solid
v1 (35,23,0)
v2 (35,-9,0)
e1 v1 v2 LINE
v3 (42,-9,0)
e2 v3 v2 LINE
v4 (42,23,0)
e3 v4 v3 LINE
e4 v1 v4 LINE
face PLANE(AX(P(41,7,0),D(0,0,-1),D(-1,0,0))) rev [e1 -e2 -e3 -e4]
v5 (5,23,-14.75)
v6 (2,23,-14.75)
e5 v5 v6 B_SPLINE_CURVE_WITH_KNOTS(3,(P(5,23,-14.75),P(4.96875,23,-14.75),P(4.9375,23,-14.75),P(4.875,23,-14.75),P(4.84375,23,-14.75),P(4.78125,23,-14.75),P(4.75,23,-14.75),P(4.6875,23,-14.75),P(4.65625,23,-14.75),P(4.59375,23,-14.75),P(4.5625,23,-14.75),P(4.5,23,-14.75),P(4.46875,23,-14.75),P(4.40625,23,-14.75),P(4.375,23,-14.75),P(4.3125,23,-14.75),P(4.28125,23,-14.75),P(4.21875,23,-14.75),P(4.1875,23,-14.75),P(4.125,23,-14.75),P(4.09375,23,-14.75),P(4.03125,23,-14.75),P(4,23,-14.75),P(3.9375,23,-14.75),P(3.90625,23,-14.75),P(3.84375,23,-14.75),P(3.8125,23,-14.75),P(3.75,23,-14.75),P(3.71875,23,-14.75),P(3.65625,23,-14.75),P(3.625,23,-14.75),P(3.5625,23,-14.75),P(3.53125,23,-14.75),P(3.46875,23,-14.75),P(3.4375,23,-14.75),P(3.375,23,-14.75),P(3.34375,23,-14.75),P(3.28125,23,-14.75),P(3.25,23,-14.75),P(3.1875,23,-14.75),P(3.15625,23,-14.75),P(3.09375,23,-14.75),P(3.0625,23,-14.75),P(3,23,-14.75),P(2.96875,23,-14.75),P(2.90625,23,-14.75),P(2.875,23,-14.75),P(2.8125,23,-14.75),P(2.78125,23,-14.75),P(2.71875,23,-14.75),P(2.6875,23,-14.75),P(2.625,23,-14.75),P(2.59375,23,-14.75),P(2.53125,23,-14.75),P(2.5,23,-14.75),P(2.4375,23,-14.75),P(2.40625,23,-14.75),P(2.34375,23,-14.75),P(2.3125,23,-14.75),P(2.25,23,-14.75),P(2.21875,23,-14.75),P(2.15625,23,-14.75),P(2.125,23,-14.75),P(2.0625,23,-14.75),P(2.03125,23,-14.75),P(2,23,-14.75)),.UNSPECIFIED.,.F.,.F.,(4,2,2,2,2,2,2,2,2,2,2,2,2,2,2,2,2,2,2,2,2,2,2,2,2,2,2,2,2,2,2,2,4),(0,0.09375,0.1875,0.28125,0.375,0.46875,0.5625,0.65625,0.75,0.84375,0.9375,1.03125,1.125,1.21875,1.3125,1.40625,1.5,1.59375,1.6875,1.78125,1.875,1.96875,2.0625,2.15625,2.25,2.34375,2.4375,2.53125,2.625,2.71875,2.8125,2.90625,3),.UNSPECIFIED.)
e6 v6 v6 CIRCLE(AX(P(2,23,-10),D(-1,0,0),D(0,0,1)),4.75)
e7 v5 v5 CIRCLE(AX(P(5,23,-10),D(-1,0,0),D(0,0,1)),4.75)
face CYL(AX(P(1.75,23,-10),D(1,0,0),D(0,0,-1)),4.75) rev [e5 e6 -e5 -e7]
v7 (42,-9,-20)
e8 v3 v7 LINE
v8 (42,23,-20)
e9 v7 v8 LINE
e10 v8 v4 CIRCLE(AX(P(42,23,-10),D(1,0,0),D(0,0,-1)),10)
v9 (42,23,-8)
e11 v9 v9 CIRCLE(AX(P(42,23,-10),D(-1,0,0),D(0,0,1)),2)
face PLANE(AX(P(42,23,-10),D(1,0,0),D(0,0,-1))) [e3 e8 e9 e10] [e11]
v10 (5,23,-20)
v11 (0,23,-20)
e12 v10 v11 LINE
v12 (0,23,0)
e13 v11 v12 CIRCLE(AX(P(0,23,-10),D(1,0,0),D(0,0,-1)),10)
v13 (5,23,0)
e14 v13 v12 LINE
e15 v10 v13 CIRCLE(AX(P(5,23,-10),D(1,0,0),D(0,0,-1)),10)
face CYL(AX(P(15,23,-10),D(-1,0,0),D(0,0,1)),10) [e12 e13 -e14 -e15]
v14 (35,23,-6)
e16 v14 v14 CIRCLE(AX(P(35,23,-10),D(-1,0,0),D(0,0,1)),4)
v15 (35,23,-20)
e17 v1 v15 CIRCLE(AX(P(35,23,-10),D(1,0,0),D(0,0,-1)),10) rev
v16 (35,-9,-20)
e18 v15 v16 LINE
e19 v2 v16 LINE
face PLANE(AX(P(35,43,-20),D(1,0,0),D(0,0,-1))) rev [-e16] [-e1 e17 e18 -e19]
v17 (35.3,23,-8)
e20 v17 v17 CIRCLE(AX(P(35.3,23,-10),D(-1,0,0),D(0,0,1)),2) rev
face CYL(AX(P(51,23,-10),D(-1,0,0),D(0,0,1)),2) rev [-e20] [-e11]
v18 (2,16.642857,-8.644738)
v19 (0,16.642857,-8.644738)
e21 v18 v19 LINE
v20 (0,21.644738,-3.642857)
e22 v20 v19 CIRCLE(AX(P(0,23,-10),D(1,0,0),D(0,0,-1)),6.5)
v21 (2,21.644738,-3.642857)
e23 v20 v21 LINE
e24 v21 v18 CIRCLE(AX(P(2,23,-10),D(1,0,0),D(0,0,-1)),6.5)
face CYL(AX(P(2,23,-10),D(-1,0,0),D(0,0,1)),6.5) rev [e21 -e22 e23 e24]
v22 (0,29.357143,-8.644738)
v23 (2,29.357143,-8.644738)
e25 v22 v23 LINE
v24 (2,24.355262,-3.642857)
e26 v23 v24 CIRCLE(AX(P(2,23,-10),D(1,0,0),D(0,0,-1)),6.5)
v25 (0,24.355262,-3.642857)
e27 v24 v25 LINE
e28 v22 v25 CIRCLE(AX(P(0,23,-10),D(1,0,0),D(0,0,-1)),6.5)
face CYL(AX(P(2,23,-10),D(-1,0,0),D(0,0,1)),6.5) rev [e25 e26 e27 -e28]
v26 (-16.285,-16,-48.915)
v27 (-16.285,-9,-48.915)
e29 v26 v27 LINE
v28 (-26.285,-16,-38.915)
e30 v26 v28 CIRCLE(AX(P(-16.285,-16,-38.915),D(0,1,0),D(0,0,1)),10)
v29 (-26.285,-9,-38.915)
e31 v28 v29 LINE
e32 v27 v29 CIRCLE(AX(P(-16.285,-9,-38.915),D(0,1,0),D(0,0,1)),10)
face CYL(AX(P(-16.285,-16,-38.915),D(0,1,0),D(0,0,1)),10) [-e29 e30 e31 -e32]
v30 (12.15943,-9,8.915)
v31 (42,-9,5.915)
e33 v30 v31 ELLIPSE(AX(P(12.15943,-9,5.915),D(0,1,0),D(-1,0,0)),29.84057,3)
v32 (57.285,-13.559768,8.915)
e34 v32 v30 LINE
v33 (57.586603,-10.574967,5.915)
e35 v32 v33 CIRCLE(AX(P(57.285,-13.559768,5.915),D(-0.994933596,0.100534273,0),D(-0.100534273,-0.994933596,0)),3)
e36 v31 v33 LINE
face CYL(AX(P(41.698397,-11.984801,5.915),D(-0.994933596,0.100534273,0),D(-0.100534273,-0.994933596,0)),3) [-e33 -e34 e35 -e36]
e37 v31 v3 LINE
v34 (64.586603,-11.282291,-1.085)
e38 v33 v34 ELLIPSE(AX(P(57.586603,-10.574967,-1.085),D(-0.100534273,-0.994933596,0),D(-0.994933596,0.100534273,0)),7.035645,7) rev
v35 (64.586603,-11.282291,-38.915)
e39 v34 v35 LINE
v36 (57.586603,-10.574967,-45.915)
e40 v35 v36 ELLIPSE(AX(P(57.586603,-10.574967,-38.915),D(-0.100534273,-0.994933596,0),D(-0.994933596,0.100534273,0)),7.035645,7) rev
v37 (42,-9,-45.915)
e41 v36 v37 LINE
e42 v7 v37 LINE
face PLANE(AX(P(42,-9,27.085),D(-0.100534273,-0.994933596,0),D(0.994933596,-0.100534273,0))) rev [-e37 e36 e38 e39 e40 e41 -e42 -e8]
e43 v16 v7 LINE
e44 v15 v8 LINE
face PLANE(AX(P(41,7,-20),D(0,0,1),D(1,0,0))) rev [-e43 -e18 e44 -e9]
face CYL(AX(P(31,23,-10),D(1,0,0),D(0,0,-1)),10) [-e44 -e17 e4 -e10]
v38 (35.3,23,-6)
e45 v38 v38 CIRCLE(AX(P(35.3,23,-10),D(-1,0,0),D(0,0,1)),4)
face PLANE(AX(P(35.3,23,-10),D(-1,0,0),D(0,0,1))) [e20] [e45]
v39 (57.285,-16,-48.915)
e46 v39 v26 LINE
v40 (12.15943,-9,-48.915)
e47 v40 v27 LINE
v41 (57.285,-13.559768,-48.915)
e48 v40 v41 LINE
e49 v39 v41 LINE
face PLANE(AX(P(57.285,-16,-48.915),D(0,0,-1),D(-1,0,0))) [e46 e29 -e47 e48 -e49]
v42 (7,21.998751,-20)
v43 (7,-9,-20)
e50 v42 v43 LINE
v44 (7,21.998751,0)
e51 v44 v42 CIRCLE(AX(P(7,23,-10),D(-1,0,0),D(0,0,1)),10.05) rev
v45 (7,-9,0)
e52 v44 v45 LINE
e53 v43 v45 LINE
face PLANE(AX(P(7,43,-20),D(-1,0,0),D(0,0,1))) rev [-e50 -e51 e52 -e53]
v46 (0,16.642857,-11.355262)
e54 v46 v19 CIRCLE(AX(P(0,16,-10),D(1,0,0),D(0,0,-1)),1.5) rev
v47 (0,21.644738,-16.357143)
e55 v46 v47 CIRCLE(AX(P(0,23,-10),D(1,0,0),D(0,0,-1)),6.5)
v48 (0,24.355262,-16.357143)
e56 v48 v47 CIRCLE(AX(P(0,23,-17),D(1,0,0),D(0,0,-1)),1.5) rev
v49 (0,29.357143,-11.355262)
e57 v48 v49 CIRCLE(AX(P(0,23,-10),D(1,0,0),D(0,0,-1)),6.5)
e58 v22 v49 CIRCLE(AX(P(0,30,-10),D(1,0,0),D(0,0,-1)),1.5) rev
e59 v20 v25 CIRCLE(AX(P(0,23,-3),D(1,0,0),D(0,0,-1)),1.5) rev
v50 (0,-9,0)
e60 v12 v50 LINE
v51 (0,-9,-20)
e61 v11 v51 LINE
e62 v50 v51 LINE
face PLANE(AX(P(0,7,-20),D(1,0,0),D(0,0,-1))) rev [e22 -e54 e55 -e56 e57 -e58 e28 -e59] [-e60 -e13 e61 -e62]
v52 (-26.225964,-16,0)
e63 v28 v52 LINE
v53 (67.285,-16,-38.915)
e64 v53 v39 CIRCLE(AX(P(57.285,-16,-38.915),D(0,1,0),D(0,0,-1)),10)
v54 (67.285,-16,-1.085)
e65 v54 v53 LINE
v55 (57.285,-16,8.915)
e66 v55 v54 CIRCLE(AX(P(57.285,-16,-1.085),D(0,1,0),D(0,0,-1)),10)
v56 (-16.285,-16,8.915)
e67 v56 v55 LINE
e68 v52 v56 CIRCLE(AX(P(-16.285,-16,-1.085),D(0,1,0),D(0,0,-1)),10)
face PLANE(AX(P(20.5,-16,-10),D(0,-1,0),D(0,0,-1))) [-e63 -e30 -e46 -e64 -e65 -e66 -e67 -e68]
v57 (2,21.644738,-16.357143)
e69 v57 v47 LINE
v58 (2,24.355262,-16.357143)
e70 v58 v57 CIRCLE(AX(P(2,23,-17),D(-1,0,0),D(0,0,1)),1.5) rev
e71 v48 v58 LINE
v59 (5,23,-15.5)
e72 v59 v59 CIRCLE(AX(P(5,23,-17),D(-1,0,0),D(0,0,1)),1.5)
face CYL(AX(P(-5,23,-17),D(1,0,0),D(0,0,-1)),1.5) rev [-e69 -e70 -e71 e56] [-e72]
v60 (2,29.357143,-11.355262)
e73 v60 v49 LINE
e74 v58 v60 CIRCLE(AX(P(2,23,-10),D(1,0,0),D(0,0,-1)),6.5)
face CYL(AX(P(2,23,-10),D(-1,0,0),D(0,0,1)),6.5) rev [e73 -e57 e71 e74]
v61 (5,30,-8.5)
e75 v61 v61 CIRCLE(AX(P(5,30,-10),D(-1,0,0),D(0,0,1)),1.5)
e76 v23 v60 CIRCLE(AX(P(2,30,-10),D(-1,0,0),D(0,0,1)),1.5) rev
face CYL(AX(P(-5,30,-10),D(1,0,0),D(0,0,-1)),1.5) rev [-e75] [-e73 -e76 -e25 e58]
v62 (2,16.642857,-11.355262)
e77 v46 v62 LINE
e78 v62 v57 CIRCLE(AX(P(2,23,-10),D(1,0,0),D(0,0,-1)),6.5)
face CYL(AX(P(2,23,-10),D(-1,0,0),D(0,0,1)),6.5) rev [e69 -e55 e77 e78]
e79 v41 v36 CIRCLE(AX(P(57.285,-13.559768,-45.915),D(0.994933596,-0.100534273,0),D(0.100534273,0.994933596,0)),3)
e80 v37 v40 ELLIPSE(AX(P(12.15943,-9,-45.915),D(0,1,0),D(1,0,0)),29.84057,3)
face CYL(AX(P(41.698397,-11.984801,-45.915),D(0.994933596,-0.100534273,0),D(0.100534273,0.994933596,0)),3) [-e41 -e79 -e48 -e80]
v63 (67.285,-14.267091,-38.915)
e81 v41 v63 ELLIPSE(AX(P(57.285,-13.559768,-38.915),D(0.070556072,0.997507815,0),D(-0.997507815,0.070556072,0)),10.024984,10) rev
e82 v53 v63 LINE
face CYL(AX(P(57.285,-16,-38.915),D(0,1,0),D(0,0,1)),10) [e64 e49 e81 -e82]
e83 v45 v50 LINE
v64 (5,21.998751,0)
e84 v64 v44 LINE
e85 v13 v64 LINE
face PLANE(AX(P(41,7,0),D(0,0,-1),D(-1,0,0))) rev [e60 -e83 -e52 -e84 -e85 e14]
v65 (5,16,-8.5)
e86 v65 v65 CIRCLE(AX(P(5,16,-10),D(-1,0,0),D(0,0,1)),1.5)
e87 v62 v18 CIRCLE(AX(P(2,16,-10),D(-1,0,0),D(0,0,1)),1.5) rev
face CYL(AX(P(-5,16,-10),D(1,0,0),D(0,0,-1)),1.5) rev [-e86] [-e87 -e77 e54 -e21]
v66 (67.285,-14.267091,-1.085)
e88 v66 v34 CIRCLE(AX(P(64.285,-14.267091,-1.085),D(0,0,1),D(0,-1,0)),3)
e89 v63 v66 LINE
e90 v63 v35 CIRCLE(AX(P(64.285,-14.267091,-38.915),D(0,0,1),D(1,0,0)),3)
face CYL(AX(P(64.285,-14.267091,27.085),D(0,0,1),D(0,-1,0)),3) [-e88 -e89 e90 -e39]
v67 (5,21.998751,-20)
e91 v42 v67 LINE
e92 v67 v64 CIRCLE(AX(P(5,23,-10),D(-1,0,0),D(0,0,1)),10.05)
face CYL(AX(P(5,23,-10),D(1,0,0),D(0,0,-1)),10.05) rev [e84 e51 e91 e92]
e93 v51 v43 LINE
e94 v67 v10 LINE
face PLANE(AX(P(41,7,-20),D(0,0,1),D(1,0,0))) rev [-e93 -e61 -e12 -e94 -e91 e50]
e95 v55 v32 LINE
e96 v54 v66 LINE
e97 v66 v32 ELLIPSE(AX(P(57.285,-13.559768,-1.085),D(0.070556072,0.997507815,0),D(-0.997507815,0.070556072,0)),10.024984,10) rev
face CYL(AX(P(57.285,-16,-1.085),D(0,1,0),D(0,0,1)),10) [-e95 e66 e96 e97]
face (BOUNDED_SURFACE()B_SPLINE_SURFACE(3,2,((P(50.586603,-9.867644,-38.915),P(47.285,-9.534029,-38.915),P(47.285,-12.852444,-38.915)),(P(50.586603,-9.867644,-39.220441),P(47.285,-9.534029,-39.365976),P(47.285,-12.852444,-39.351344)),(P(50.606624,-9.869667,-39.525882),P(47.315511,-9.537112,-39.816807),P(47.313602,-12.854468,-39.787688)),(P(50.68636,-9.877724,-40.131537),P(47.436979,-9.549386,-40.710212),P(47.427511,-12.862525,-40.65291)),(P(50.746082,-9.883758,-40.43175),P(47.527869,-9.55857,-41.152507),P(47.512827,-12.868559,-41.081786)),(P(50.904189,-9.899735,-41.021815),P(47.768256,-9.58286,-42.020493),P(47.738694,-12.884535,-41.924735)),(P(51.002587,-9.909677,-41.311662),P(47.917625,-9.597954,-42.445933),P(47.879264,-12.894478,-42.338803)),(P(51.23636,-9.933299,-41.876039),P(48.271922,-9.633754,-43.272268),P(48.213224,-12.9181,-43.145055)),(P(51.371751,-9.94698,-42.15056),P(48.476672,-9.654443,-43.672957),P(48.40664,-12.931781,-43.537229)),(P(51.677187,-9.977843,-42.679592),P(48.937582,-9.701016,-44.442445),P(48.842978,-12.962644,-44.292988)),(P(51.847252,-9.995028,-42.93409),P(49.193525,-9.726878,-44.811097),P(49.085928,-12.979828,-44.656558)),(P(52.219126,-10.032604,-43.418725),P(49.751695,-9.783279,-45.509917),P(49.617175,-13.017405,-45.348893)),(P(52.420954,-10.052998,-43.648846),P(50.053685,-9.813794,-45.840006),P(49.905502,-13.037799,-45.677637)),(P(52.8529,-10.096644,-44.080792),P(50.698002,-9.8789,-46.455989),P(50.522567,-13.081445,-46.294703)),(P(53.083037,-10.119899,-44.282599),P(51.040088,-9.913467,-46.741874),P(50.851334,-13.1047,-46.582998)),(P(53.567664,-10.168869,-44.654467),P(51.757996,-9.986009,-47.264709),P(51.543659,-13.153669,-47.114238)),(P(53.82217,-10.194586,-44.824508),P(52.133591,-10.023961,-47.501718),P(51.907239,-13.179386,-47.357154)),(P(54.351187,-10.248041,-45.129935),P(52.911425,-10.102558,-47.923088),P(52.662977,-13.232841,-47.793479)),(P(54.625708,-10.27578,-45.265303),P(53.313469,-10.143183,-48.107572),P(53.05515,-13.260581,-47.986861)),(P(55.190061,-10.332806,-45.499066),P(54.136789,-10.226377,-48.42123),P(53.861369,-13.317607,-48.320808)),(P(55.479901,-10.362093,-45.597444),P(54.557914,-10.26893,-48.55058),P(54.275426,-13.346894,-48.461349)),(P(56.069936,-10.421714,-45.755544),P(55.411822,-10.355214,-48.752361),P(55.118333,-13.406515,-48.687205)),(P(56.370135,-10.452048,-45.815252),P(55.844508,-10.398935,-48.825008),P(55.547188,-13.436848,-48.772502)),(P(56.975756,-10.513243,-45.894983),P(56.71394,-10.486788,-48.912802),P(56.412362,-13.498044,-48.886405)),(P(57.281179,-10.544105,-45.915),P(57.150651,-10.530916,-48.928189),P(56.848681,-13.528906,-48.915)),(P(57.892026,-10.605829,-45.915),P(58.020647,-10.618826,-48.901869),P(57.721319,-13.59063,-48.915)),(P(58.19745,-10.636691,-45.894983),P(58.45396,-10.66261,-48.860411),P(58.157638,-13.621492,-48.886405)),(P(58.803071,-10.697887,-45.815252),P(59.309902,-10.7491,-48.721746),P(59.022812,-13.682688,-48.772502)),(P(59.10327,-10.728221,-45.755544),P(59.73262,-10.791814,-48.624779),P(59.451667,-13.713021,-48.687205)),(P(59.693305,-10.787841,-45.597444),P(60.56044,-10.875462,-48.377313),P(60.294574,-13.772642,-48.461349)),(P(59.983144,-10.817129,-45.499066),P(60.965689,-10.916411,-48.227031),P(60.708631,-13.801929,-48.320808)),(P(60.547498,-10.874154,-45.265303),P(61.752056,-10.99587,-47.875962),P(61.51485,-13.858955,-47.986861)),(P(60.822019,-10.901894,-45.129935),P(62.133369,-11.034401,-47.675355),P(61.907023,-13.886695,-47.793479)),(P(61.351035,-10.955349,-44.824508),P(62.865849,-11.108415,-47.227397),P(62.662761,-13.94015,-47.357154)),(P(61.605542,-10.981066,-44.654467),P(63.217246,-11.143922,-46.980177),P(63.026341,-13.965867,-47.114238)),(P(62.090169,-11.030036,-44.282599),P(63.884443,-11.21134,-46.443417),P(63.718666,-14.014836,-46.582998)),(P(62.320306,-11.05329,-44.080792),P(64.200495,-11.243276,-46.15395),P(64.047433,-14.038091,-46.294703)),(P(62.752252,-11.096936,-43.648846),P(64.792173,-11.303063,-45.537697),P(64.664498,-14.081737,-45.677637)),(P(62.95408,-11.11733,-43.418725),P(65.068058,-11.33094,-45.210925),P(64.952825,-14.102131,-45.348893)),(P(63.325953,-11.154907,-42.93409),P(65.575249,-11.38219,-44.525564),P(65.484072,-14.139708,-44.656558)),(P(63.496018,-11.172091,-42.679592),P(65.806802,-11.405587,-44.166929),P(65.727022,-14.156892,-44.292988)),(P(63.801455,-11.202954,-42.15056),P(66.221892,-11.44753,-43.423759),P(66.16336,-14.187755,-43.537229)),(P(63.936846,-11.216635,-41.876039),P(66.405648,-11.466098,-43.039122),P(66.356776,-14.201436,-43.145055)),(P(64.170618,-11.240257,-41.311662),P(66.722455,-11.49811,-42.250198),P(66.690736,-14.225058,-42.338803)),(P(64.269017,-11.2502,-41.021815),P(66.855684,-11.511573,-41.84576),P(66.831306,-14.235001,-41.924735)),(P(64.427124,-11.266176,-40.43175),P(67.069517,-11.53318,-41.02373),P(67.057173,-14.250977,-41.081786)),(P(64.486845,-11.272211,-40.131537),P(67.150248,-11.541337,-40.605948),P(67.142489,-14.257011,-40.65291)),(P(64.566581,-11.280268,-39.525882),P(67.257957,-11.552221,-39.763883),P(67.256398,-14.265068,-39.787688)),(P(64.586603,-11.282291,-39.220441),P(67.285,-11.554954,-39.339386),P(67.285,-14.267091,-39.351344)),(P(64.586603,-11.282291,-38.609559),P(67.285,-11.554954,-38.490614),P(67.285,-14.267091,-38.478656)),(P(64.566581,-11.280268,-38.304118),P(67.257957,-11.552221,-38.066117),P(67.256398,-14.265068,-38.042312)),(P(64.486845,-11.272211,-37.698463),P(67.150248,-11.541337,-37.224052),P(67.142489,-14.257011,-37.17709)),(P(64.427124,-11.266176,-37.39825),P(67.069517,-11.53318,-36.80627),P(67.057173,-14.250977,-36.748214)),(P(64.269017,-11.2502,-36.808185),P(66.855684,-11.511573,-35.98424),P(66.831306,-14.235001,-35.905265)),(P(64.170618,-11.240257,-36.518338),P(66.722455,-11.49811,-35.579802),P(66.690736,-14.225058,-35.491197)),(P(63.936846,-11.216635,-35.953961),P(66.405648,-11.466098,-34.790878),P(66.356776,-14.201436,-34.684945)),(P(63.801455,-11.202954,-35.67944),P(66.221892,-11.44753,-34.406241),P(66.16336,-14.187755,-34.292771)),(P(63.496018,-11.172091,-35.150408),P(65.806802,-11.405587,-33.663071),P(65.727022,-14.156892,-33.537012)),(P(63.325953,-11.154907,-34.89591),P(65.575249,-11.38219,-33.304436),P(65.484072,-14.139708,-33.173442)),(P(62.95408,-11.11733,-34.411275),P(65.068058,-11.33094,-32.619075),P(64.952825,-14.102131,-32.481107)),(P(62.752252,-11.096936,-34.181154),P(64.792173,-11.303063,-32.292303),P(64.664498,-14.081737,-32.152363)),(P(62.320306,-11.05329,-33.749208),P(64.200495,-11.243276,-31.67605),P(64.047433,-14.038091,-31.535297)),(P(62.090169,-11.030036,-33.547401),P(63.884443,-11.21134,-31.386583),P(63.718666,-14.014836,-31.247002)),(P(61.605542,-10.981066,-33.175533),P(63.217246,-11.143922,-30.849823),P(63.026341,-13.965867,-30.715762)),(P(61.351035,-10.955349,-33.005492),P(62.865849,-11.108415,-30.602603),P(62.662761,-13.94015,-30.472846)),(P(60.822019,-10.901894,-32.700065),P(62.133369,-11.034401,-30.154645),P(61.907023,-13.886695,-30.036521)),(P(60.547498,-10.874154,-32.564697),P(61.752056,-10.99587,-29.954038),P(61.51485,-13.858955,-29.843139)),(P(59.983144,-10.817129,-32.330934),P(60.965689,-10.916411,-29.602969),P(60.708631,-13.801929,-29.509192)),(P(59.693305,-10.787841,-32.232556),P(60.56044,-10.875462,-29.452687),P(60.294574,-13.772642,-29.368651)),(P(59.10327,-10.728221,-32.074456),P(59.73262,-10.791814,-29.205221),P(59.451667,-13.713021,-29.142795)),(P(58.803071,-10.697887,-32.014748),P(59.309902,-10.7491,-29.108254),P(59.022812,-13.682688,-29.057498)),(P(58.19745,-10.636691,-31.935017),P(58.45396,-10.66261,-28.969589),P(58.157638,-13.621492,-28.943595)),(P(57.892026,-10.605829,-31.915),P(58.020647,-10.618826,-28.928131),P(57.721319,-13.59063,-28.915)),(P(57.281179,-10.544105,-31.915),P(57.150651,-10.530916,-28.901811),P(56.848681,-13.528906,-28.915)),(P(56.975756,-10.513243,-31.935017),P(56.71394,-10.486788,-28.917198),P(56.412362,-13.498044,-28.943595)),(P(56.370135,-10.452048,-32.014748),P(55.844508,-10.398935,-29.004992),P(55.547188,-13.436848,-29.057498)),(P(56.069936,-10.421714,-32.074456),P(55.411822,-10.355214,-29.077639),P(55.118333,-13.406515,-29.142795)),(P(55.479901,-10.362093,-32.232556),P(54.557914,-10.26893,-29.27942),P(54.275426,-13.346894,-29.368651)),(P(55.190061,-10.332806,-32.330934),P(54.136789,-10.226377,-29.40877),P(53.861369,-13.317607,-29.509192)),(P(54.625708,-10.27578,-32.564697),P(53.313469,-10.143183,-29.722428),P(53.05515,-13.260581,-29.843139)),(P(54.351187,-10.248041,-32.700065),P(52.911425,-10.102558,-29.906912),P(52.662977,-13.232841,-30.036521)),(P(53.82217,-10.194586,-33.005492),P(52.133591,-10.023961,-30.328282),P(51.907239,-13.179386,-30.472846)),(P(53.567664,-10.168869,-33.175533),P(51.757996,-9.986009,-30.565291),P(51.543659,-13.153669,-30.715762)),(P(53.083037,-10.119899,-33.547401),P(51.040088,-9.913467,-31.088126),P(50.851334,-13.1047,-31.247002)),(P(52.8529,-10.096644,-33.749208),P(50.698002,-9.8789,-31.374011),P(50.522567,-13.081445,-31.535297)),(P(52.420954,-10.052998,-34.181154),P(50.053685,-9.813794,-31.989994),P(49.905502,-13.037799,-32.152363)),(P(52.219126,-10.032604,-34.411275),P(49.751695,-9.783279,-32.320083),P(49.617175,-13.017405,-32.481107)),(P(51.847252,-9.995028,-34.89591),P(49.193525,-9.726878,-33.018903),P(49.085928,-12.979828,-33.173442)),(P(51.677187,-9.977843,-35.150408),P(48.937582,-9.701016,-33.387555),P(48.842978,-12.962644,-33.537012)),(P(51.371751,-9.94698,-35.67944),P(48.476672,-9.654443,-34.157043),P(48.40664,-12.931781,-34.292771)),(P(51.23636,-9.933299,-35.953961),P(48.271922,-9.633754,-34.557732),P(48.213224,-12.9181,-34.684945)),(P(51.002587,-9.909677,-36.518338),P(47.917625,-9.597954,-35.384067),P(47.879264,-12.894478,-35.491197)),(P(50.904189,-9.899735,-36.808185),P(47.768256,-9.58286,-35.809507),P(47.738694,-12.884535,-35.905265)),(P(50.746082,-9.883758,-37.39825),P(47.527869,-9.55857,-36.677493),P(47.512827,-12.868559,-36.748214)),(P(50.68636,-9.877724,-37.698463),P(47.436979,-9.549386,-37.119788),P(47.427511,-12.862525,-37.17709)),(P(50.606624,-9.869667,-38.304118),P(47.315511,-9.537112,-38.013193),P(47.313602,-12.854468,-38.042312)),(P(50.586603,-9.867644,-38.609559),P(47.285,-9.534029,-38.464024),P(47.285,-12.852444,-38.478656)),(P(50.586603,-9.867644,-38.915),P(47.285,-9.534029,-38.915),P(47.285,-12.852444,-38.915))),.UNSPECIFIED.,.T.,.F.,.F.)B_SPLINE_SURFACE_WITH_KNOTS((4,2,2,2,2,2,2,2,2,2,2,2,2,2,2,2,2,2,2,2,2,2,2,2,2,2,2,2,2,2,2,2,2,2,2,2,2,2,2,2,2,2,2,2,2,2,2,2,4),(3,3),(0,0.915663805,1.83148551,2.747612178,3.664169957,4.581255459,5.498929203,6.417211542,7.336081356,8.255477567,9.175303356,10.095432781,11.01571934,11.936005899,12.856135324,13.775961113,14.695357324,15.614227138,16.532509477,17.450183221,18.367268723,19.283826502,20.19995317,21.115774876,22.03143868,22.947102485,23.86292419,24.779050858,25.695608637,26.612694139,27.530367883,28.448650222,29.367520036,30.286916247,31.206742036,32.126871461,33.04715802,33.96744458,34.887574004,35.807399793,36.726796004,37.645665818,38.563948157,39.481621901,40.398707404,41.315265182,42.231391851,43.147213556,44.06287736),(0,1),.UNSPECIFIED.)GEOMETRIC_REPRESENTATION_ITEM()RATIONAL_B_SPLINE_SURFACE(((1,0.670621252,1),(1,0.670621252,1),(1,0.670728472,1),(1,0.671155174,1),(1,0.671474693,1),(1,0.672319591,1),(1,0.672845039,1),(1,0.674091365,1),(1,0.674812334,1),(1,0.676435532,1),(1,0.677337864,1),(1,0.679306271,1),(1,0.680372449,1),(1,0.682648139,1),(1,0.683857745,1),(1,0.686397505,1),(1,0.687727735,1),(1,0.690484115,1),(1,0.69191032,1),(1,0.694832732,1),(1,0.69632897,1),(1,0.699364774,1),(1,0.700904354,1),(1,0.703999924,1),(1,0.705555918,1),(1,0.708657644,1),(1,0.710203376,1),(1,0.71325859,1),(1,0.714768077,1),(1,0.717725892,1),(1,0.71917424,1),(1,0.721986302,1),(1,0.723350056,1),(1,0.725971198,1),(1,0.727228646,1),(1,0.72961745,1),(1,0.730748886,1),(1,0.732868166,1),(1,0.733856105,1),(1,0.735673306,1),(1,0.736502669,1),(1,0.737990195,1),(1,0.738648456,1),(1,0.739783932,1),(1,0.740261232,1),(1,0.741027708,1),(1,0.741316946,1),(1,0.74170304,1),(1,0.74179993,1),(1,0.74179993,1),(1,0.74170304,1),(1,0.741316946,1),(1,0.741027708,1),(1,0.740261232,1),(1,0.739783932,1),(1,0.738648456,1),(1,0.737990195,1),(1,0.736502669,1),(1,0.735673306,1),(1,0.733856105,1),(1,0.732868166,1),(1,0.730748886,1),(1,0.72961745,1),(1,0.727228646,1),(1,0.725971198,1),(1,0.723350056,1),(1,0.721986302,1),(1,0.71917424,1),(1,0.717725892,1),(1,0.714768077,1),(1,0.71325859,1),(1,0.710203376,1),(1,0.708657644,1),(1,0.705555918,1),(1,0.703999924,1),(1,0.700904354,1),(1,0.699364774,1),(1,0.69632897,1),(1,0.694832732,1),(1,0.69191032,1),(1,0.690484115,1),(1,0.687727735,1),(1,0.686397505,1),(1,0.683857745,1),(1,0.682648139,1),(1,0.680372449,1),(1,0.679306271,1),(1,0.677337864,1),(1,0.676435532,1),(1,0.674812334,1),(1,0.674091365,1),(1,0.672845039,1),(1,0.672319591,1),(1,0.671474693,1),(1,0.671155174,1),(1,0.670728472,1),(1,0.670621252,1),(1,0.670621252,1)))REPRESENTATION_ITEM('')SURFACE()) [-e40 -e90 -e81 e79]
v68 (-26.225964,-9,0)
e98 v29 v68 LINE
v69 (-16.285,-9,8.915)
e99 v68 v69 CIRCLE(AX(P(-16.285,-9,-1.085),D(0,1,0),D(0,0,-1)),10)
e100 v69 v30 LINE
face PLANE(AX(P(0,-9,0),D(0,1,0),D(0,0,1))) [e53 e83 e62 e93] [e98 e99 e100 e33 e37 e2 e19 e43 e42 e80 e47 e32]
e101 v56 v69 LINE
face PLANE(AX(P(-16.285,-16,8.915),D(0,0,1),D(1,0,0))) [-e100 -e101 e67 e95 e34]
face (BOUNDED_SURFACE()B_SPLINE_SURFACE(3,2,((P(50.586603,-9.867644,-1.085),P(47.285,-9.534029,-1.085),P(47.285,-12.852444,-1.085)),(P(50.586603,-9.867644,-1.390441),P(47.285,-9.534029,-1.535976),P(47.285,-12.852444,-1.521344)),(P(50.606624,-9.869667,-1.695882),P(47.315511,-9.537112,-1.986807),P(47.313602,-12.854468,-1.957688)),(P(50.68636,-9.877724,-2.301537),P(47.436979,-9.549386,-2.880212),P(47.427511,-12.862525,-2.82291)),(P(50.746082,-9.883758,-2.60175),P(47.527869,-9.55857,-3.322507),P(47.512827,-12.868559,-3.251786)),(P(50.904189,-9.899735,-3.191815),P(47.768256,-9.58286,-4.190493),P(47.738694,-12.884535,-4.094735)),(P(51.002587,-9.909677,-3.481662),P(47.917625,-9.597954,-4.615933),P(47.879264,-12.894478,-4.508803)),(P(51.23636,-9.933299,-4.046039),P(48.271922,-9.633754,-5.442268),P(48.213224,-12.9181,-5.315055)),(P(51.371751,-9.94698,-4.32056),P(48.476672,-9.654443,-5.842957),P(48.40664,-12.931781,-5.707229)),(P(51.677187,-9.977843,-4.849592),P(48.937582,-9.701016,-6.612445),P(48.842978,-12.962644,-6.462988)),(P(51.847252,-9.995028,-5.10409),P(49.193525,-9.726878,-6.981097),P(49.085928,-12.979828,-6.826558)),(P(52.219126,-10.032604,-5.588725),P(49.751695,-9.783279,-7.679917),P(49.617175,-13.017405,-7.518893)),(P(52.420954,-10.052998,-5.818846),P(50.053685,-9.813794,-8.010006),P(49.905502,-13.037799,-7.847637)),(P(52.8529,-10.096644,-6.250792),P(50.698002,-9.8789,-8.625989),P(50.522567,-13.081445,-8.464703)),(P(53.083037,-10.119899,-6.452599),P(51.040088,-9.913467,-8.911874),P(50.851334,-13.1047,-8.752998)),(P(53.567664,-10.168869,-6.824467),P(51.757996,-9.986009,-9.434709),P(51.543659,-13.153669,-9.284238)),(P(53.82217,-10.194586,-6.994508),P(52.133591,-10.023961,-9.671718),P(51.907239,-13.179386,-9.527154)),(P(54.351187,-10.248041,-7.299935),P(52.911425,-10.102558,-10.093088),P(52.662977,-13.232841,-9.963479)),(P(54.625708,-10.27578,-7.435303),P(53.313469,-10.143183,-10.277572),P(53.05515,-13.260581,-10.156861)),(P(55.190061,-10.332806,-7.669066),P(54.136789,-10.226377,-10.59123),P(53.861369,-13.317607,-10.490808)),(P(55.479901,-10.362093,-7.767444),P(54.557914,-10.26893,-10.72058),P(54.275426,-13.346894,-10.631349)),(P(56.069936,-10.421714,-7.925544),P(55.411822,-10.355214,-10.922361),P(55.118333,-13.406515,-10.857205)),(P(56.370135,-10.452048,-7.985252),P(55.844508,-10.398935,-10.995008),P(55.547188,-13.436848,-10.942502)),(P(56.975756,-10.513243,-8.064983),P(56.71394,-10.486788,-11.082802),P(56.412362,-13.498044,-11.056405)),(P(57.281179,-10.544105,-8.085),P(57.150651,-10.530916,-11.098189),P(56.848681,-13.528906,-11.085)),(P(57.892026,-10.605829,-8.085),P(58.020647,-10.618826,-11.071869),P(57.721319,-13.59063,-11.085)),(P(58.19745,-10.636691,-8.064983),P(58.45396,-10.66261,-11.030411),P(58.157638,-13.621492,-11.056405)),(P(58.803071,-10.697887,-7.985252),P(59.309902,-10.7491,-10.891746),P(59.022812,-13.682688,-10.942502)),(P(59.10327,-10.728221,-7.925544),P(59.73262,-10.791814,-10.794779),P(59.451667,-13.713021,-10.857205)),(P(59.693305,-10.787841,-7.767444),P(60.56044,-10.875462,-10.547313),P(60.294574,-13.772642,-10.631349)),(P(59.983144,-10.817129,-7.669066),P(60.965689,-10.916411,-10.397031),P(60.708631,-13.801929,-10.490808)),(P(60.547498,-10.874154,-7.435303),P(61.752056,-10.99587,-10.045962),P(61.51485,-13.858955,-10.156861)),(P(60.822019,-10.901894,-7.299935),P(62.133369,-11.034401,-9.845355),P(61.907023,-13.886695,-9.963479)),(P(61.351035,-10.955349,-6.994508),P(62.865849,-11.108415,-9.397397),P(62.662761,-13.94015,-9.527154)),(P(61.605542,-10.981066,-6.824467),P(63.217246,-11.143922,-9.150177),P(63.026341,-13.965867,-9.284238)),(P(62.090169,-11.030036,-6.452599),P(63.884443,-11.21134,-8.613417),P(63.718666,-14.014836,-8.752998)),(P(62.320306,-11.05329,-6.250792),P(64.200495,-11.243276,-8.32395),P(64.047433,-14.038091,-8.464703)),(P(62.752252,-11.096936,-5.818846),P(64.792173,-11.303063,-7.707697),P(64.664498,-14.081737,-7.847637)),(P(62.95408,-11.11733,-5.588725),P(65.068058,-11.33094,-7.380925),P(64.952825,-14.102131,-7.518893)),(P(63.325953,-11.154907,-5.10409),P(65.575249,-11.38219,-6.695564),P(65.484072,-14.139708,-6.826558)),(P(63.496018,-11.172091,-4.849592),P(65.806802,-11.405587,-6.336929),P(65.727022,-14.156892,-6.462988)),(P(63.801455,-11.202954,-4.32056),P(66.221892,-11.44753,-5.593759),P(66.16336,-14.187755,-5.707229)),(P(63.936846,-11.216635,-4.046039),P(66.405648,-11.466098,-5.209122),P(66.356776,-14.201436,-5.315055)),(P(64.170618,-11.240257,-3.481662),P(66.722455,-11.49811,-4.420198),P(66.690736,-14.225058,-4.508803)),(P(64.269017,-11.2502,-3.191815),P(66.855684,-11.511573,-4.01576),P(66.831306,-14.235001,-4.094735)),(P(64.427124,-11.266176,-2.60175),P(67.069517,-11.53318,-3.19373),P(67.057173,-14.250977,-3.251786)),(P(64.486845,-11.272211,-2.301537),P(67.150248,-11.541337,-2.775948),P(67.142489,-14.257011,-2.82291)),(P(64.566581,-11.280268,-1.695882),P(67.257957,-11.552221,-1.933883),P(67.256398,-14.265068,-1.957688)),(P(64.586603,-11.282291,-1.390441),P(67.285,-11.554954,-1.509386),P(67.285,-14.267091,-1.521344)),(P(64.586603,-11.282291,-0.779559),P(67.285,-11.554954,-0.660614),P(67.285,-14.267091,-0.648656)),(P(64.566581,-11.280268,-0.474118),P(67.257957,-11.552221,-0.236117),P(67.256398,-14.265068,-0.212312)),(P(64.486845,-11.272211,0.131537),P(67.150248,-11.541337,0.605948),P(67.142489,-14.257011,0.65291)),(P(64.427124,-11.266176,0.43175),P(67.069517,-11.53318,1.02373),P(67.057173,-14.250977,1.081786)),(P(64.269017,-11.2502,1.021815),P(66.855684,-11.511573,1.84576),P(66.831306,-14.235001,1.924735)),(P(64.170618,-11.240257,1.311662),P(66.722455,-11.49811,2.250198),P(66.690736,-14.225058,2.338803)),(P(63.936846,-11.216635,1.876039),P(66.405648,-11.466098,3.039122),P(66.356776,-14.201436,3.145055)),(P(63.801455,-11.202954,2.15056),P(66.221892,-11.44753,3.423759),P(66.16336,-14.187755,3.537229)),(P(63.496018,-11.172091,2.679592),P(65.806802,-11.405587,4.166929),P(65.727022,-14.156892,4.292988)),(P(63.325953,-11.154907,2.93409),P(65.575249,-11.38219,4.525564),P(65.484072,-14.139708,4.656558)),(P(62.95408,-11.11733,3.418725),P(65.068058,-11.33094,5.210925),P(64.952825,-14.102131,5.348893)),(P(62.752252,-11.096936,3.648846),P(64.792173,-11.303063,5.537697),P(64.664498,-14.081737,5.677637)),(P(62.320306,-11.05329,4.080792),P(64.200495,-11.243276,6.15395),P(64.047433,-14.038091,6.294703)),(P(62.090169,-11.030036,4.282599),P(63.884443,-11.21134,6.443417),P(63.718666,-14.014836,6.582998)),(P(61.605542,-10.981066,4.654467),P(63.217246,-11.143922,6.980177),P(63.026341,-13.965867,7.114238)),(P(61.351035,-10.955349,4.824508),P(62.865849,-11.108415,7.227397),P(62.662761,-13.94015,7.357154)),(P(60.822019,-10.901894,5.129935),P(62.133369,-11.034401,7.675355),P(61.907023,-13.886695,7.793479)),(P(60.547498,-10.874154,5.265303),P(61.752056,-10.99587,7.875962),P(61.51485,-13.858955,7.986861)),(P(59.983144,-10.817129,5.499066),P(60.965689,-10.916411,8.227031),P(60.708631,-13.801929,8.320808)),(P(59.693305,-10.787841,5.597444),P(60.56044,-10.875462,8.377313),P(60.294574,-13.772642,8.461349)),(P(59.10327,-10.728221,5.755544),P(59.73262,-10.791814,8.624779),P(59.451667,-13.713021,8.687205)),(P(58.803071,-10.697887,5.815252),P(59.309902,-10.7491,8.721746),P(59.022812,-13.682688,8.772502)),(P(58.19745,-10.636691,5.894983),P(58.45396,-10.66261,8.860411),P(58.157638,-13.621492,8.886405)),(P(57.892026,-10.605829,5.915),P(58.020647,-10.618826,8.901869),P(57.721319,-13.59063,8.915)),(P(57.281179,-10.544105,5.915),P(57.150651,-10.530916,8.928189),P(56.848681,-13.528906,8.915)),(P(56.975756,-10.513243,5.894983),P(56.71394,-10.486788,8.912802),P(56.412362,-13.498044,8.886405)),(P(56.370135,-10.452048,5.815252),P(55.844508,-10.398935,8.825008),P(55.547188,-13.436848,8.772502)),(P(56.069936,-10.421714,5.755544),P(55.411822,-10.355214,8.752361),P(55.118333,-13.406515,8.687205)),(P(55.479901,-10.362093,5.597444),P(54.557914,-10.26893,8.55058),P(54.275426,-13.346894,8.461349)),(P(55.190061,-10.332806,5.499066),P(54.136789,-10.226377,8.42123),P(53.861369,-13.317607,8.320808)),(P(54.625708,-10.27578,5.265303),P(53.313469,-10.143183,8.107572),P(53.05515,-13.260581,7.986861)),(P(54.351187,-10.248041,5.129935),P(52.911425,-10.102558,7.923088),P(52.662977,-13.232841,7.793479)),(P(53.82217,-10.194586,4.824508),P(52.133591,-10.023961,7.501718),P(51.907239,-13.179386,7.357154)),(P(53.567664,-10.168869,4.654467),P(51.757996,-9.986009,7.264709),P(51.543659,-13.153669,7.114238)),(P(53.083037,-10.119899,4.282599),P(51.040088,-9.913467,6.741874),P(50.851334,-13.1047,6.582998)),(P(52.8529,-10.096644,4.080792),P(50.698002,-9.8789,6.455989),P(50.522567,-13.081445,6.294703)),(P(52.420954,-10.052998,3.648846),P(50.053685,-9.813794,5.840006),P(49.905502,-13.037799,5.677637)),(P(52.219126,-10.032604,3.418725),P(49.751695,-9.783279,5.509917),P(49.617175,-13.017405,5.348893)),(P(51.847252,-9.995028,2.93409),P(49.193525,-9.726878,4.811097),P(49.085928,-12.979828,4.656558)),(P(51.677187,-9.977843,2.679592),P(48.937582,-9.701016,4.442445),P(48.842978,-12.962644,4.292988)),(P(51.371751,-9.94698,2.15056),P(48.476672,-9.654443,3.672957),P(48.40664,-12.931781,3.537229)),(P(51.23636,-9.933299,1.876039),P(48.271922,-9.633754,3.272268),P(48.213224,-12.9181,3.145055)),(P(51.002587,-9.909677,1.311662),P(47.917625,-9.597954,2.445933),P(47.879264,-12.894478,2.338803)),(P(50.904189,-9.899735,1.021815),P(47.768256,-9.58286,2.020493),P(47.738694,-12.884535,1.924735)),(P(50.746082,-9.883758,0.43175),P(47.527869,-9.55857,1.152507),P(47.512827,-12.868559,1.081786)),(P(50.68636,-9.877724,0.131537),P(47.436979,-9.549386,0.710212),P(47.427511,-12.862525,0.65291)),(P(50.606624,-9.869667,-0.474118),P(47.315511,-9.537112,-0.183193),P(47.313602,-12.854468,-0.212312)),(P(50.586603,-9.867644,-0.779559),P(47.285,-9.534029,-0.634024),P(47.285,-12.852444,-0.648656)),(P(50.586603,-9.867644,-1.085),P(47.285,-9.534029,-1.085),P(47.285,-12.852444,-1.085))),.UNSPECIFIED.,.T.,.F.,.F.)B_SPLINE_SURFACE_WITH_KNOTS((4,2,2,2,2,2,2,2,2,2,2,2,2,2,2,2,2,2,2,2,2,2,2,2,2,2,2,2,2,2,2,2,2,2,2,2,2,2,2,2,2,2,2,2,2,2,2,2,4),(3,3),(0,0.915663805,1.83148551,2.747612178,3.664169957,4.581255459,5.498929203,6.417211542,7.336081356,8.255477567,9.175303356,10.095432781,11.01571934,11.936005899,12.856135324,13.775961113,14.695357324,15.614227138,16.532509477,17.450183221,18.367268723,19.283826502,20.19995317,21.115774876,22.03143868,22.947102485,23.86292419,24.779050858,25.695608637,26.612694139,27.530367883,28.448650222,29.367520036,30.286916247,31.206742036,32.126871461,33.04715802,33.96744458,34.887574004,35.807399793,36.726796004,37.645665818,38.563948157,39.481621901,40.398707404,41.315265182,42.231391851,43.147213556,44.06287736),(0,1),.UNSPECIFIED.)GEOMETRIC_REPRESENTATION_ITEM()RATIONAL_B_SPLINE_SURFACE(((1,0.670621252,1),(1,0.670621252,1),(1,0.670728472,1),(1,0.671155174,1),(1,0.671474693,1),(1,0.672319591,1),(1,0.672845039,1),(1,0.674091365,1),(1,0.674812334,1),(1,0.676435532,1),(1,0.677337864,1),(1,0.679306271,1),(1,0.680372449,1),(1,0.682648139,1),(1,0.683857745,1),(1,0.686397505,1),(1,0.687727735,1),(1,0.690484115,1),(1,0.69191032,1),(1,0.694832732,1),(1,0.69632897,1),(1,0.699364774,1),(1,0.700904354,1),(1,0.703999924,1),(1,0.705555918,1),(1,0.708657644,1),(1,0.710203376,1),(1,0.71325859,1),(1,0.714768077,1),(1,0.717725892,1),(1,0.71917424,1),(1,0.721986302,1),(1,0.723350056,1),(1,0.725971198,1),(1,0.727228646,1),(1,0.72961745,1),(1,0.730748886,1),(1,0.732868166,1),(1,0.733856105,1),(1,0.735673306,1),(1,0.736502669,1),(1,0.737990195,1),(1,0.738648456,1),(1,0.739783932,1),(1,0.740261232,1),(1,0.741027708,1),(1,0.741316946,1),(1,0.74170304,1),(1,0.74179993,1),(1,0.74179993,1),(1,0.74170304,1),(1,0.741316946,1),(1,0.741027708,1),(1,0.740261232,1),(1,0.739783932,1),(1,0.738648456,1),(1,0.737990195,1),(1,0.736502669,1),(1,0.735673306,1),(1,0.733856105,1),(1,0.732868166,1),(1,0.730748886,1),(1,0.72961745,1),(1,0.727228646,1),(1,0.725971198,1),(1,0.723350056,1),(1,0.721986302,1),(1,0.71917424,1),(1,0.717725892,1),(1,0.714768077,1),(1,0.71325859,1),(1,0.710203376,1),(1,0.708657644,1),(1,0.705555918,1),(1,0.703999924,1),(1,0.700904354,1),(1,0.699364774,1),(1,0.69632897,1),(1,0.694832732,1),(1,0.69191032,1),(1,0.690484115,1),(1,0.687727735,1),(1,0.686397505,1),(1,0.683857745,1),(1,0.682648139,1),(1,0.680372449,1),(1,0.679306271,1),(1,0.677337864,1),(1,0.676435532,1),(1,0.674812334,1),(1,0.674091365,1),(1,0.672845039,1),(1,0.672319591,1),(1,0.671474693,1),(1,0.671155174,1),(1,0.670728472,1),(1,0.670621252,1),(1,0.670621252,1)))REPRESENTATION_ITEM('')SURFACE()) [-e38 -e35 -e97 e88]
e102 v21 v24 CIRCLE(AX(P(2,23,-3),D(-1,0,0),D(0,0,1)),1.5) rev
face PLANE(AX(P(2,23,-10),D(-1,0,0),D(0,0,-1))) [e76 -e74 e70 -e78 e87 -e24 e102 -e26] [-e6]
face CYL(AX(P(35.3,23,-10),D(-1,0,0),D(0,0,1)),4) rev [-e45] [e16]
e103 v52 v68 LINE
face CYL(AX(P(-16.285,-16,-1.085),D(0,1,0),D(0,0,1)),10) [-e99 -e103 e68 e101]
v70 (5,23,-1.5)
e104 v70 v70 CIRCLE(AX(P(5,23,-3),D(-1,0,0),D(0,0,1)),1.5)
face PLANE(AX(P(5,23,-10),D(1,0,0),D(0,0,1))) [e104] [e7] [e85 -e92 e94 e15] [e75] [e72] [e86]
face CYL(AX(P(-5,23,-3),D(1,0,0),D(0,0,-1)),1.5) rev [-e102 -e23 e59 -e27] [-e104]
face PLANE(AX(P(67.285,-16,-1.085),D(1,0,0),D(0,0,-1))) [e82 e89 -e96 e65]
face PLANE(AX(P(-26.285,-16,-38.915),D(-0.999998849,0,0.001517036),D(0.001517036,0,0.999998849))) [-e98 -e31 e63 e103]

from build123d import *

# Parameters (mm, degrees)
SKETCH1_W                = 41
SKETCH1_H                = 20
BOSS_EXTRUDE2_DEPTH      = 7
SKETCH3_R                = 10.05
CUT_EXTRUDE8_DEPTH       = 2
SKETCH4_R                = 1.5
SKETCH4_R_2              = 3
CUT_EXTRUDE9_DEPTH       = 29
SKETCH5_W                = 6
SKETCH5_H                = 20
SKETCH5_W_2              = 7
BOSS_EXTRUDE3_DEPTH      = 36
CUT_EXTRUDE10_DEPTH      = 36
SKETCH7_R                = 2
CUT_EXTRUDE11_DEPTH      = 51
SKETCH8_R                = 10.05
CUT_EXTRUDE12_DEPTH      = 2
SKETCH9_R                = 4.75
CUT_EXTRUDE13_DEPTH      = 3.25
SKETCH10_R               = 6.5
CUT_EXTRUDE14_DEPTH      = 2
CUT_EXTRUDE15_DEPTH      = 14
CUT_EXTRUDE15_DEPTH_BACK = 10
SKETCH12_R               = 1.5
CUT_EXTRUDE16_DEPTH      = 10
CUT_EXTRUDE17_DEPTH      = 10
MIRROR1_START            = 5
MIRROR1_DEPTH            = 2
MIRROR1_2_DEPTH          = 7
MIRROR1_3_DEPTH          = 5
CUT_EXTRUDE18_DEPTH      = 10
CUT_EXTRUDE18_DEPTH_BACK = 10
BOSS_EXTRUDE4_START      = 16
BOSS_EXTRUDE4_DEPTH      = 16
BOSS_EXTRUDE6_START      = -21
SKETCH16_W               = 28
SKETCH16_H               = 20
SKETCH16_R               = 1.5
SKETCH16_R_2             = 3
BOSS_EXTRUDE6_DEPTH      = 21
SKETCH18_W               = 28
SKETCH18_H               = 20
CUT_EXTRUDE21_DEPTH      = 16
CROQUIS2_R               = 3
CORTAR_EXTRUIR1_DEPTH    = 3
CROQUIS3_R               = 4
CORTAR_EXTRUIR2_DEPTH    = 0.3
SALIENTE_EXTRUIR1_DEPTH  = 1
CROQUIS5_R               = 2
CORTAR_EXTRUIR3_DEPTH    = 1
SALIENTE_EXTRUIR2_DEPTH  = 7
CORTAR_EXTRUIR4_DEPTH    = 76
REDONDEO1_R              = 3


# Read off the part's stored shape, not the designer's step: Mirror1
with BuildPart() as part:
    # Sketch1 → Boss-Extrude2 (new body)
    with BuildSketch(Plane(origin=(0, 0, 0), x_dir=(1, 0, 0), z_dir=(0, 1, 0))):
        with Locations((20.5, 10)):
            Rectangle(SKETCH1_W, SKETCH1_H)
    extrude(amount=BOSS_EXTRUDE2_DEPTH)

    # Sketch3 → Cut-Extrude8 (cut)
    with BuildSketch(Plane.XZ):
        with Locations((20.5, -10)):
            Circle(SKETCH3_R)
    extrude(amount=-CUT_EXTRUDE8_DEPTH, mode=Mode.SUBTRACT)

    # Sketch4 → Cut-Extrude9 (cut)
    with BuildSketch(Plane.XZ.offset(-2)):
        with Locations(Location((20.5, -2.95, 0), (0, 0, 270))):
            Circle(SKETCH4_R)
        with Locations(Location((27.55, -10, 0), (0, 0, 270))):
            Circle(SKETCH4_R)
        with Locations(Location((20.5, -17.05, 0), (0, 0, 270))):
            Circle(SKETCH4_R)
        with Locations(Location((13.45, -10, 0), (0, 0, 270))):
            Circle(SKETCH4_R)
        with Locations(Location((20.5, -10, 0), (0, 0, 270))):
            Circle(SKETCH4_R_2)
    extrude(amount=-CUT_EXTRUDE9_DEPTH, mode=Mode.SUBTRACT)

    # Sketch5 → Boss-Extrude3 (add)
    with BuildSketch(Plane(origin=(0, 7, 0), x_dir=(1, 0, 0), z_dir=(0, 1, 0))):
        with Locations((38, 10)):
            Rectangle(SKETCH5_W, SKETCH5_H)
        with Locations((3.5, 10)):
            Rectangle(SKETCH5_W_2, SKETCH5_H)
    extrude(amount=BOSS_EXTRUDE3_DEPTH)

    # Sketch6 → Cut-Extrude10 (cut)
    with BuildSketch(Plane.XY):
        Polygon((0, 33), (71.43253461, 33), (71.43253461, 55.308458538), (-13.966778087, 55.308458538), align=None)
    extrude(amount=-CUT_EXTRUDE10_DEPTH, mode=Mode.SUBTRACT)

    # Sketch7 → Cut-Extrude11 (cut)
    with BuildSketch(Plane.ZY):
        with Locations((-10, 23)):
            Circle(SKETCH7_R)
    extrude(amount=-CUT_EXTRUDE11_DEPTH, mode=Mode.SUBTRACT)

    # Sketch8 → Cut-Extrude12 (cut)
    with BuildSketch(Plane.ZY):
        with Locations((-10, 23)):
            Circle(SKETCH8_R)
    extrude(amount=-CUT_EXTRUDE12_DEPTH, mode=Mode.SUBTRACT)

    # Sketch9 → Cut-Extrude13 (cut)
    with BuildSketch(Plane.ZY.offset(-2)):
        with Locations((-10, 23)):
            Circle(SKETCH9_R)
    extrude(amount=-CUT_EXTRUDE13_DEPTH, mode=Mode.SUBTRACT)

    # Sketch10 → Cut-Extrude14 (cut)
    with BuildSketch(Plane(origin=(7, 0, 0), x_dir=(0, 0, -1), z_dir=(1, 0, 0))):
        with Locations((10, 23)):
            Circle(SKETCH10_R)
    extrude(amount=-CUT_EXTRUDE14_DEPTH, mode=Mode.SUBTRACT)

    # Sketch11 → Cut-Extrude15 (cut, two sides: drawn at the far end of the back side and taken through both)
    with BuildSketch(Plane.ZY.offset(-2).offset(-CUT_EXTRUDE15_DEPTH_BACK)):
        with BuildLine():
            Line((0, 23), (15.490351621, 23))
            Line((15.490351621, 23), (12.295560885, 45.157965149))
            Line((12.295560885, 45.157965149), (-24.464924867, 45.157965149))
            Line((-24.464924867, 45.157965149), (-29.902866546, 24.493786768))
            Line((-29.902866546, 24.493786768), (-20, 23))
            ThreePointArc((-20, 23), (-10, 33), (0, 23))
        make_face()
    extrude(amount=CUT_EXTRUDE15_DEPTH + CUT_EXTRUDE15_DEPTH_BACK, mode=Mode.SUBTRACT)

    # Sketch12 → Cut-Extrude16 (cut)
    with BuildSketch(Plane.ZY.offset(-2)):
        with Locations((-10, 30)):
            Circle(SKETCH12_R)
        with Locations((-3, 23)):
            Circle(SKETCH12_R)
        with Locations((-10, 16)):
            Circle(SKETCH12_R)
        with Locations((-17, 23)):
            Circle(SKETCH12_R)
    extrude(amount=-CUT_EXTRUDE16_DEPTH, mode=Mode.SUBTRACT)

    # Sketch13 → Cut-Extrude17 (cut)
    with BuildSketch(Plane(origin=(41, 0, 0), x_dir=(0, 0, -1), z_dir=(1, 0, 0))):
        with BuildLine():
            Line((20, 23), (26.17535893, 23))
            Line((26.17535893, 23), (24.098367316, 34.532076054))
            Line((24.098367316, 34.532076054), (-4.476002155, 34.532076054))
            Line((-4.476002155, 34.532076054), (-5.608906672, 23))
            Line((-5.608906672, 23), (0, 23))
            ThreePointArc((0, 23), (10, 33), (20, 23))
        make_face()
    extrude(amount=-CUT_EXTRUDE17_DEPTH, mode=Mode.SUBTRACT)

    # Mirror1 outline → Mirror1 (cut)
    with BuildSketch(Plane.YZ.offset(MIRROR1_START)):
        with BuildLine():
            Line((23, 0), (21.99875078, 0))
            ThreePointArc((21.99875078, 0), (12.95, -10), (21.99875078, -20))
            Line((21.99875078, -20), (23, -20))
            ThreePointArc((23, -20), (33, -10), (23, 0))
        make_face()
        with BuildLine():
            ThreePointArc((24.355261854, -16.357142857), (23, -18.5), (21.644738146, -16.357142857))
            ThreePointArc((21.644738146, -16.357142857), (18.403805922, -14.596194078), (16.642857143, -11.355261854))
            ThreePointArc((16.642857143, -11.355261854), (14.5, -10), (16.642857143, -8.644738146))
            ThreePointArc((16.642857143, -8.644738146), (18.403805922, -5.403805922), (21.644738146, -3.642857143))
            ThreePointArc((21.644738146, -3.642857143), (23, -1.5), (24.355261854, -3.642857143))
            ThreePointArc((24.355261854, -3.642857143), (27.596194078, -5.403805922), (29.357142857, -8.644738146))
            ThreePointArc((29.357142857, -8.644738146), (31.5, -10), (29.357142857, -11.355261854))
            ThreePointArc((29.357142857, -11.355261854), (27.596194078, -14.596194078), (24.355261854, -16.357142857))
        make_face(mode=Mode.SUBTRACT)
    extrude(amount=MIRROR1_DEPTH, mode=Mode.SUBTRACT)



with BuildPart() as body_2:
    # Mirror1 2 outline → Mirror1 2 (new body)
    with BuildSketch(Plane.YZ):
        with BuildLine():
            Line((43, 0), (24.00124922, 0))
            ThreePointArc((24.00124922, 0), (33.05, -10), (24.00124922, -20))
            Line((24.00124922, -20), (43, -20))
            Line((43, -20), (43, 0))
        make_face()
    extrude(amount=MIRROR1_2_DEPTH)


with BuildPart() as part_1:
    add(part.part)

    add(body_2.part)  # Mirror1 3 merges body 2
    # Mirror1 3 outline → Mirror1 3 (add)
    with BuildSketch(Plane.YZ):
        with BuildLine():
            ThreePointArc((21.99875078, 0), (12.95, -10), (21.99875078, -20))
            Line((21.99875078, -20), (24.00124922, -20))
            ThreePointArc((24.00124922, -20), (33.05, -10), (24.00124922, 0))
            Line((24.00124922, 0), (21.99875078, 0))
        make_face()
        with BuildLine():
            ThreePointArc((24.355261854, -16.357142857), (23, -18.5), (21.644738146, -16.357142857))
            ThreePointArc((21.644738146, -16.357142857), (18.403805922, -14.596194078), (16.642857143, -11.355261854))
            ThreePointArc((16.642857143, -11.355261854), (14.5, -10), (16.642857143, -8.644738146))
            ThreePointArc((16.642857143, -8.644738146), (18.403805922, -5.403805922), (21.644738146, -3.642857143))
            ThreePointArc((21.644738146, -3.642857143), (23, -1.5), (24.355261854, -3.642857143))
            ThreePointArc((24.355261854, -3.642857143), (27.596194078, -5.403805922), (29.357142857, -8.644738146))
            ThreePointArc((29.357142857, -8.644738146), (31.5, -10), (29.357142857, -11.355261854))
            ThreePointArc((29.357142857, -11.355261854), (27.596194078, -14.596194078), (24.355261854, -16.357142857))
        make_face(mode=Mode.SUBTRACT)
    extrude(amount=MIRROR1_3_DEPTH)

    # Sketch14 → Cut-Extrude18 (cut, two sides: drawn at the far end of the back side and taken through both)
    with BuildSketch(Plane(origin=(5, 0, 0), x_dir=(0, 0, -1), z_dir=(1, 0, 0)).offset(-CUT_EXTRUDE18_DEPTH_BACK)):
        with BuildLine():
            Line((20, 23), (39.442144398, 23))
            Line((39.442144398, 23), (24.053498228, 52.618460363))
            Line((24.053498228, 52.618460363), (-15.863160605, 48.721271778))
            Line((-15.863160605, 48.721271778), (-25.901373625, 22.149531431))
            Line((-25.901373625, 22.149531431), (0, 23))
            ThreePointArc((0, 23), (10, 33), (20, 23))
        make_face()
    extrude(amount=CUT_EXTRUDE18_DEPTH + CUT_EXTRUDE18_DEPTH_BACK, mode=Mode.SUBTRACT)

    # Sketch15 → Boss-Extrude4 (add)
    with BuildSketch(Plane.XZ.offset(BOSS_EXTRUDE4_START)):
        with BuildLine():
            Line((21.50124922, 0), (41, 0))
            Line((41, 0), (41, -20))
            Line((41, -20), (21.50124922, -20))
            ThreePointArc((21.50124922, -20), (30.55, -10), (21.50124922, 0))
        make_face()
        with BuildLine():
            Line((0, 0), (19.49875078, 0))
            ThreePointArc((19.49875078, 0), (10.45, -10), (19.49875078, -20))
            Line((19.49875078, -20), (0, -20))
            Line((0, -20), (0, 0))
        make_face()
    extrude(amount=-BOSS_EXTRUDE4_DEPTH)

    # Sketch16 → Boss-Extrude6 (add)
    with BuildSketch(Plane(origin=(0, 7, 0), x_dir=(1, 0, 0), z_dir=(0, 1, 0)).offset(BOSS_EXTRUDE6_START)):
        with Locations((21, 10)):
            Rectangle(SKETCH16_W, SKETCH16_H)
        with Locations(Location((27.55, 10, 0), (0, 0, 90))):
            Circle(SKETCH16_R, mode=Mode.SUBTRACT)
        with Locations(Location((20.5, 10, 0), (0, 0, 90))):
            Circle(SKETCH16_R_2, mode=Mode.SUBTRACT)
        with Locations(Location((13.45, 10, 0), (0, 0, 90))):
            Circle(SKETCH16_R, mode=Mode.SUBTRACT)
        with Locations(Location((20.5, 17.05, 0), (0, 0, 90))):
            Circle(SKETCH16_R, mode=Mode.SUBTRACT)
        with Locations(Location((20.5, 2.95, 0), (0, 0, 90))):
            Circle(SKETCH16_R, mode=Mode.SUBTRACT)
    extrude(amount=BOSS_EXTRUDE6_DEPTH)

    # Sketch18 → Cut-Extrude21 (cut)
    with BuildSketch(Plane(origin=(0, 7, 0), x_dir=(1, 0, 0), z_dir=(0, 1, 0))):
        with Locations((21, 10)):
            Rectangle(SKETCH18_W, SKETCH18_H)
    extrude(amount=-CUT_EXTRUDE21_DEPTH, mode=Mode.SUBTRACT)

    # Croquis2 → Cortar-Extruir1 (cut)
    with BuildSketch(Plane(origin=(0, -9, 0), x_dir=(1, 0, 0), z_dir=(0, 1, 0))):
        with Locations(Location((27.55, 10, 0), (0, 0, 270))):
            Circle(CROQUIS2_R)
        with Locations((20.5, 17.05)):
            Circle(CROQUIS2_R)
        with Locations(Location((13.45, 10, 0), (0, 0, 270))):
            Circle(CROQUIS2_R)
        with Locations((20.5, 2.95)):
            Circle(CROQUIS2_R)
    extrude(amount=-CORTAR_EXTRUIR1_DEPTH, mode=Mode.SUBTRACT)

    # Croquis3 → Cortar-Extruir2 (cut)
    with BuildSketch(Plane.ZY.offset(-35)):
        with Locations((-10, 23)):
            Circle(CROQUIS3_R)
    extrude(amount=-CORTAR_EXTRUIR2_DEPTH, mode=Mode.SUBTRACT)

    # Croquis4 → Saliente-Extruir1 (add)
    with BuildSketch(Plane(origin=(41, 0, 0), x_dir=(0, 0, -1), z_dir=(1, 0, 0))):
        with BuildLine():
            Line((20, -16), (20, 23))
            ThreePointArc((20, 23), (10, 33), (0, 23))
            Line((0, 23), (0, -16))
            Line((0, -16), (20, -16))
        make_face()
    extrude(amount=SALIENTE_EXTRUIR1_DEPTH)

    # Croquis5 → Cortar-Extruir3 (cut)
    with BuildSketch(Plane.ZY.offset(-41)):
        with Locations((-10, 23)):
            Circle(CROQUIS5_R)
    extrude(amount=-CORTAR_EXTRUIR3_DEPTH, mode=Mode.SUBTRACT)

    # Croquis6 → Saliente-Extruir2 (add)
    with BuildSketch(Plane(origin=(0, -9, 0), x_dir=(1, 0, 0), z_dir=(0, 1, 0))):
        with BuildLine():
            Line((57.285, 48.915), (-16.285, 48.915))
            ThreePointArc((-16.285, 48.915), (-23.356067812, 45.986067812), (-26.285, 38.915))
            Line((-26.285, 38.915), (-26.22596449, 0))
            ThreePointArc((-26.22596449, 0), (-22.961451153, -6.359796841), (-16.285, -8.915))
            Line((-16.285, -8.915), (57.285, -8.915))
            ThreePointArc((57.285, -8.915), (64.356067812, -5.986067812), (67.285, 1.085))
            Line((67.285, 1.085), (67.285, 38.915))
            ThreePointArc((67.285, 38.915), (64.356067812, 45.986067812), (57.285, 48.915))
        make_face()
    extrude(amount=-SALIENTE_EXTRUIR2_DEPTH)

    # Croquis8 → Cortar-Extruir4 (cut)
    with BuildSketch(Plane(origin=(0, 0, -48.915), x_dir=(-1, 0, 0), z_dir=(0, 0, -1))):
        Polygon((-42, -9), (-78.538129526, -12.692039661), (-74.698456834, 7.097042671), align=None)
    extrude(amount=-CORTAR_EXTRUIR4_DEPTH, mode=Mode.SUBTRACT)

    # Redondeo1
    redondeo1_edges = [part_1.edges().sort_by_distance(p)[0] for p in [
        (64.347083214, -11.258088156, -45.995041009),
        (49.6425, -9.772245692, 8.915),
        (64.347083214, -11.258088156, 5.995041009),
        (67.285, -11.554953525, -20),
        (49.6425, -9.772245692, -48.915),
    ]]
    fillet(redondeo1_edges, radius=REDONDEO1_R)


solid = part_1.part
